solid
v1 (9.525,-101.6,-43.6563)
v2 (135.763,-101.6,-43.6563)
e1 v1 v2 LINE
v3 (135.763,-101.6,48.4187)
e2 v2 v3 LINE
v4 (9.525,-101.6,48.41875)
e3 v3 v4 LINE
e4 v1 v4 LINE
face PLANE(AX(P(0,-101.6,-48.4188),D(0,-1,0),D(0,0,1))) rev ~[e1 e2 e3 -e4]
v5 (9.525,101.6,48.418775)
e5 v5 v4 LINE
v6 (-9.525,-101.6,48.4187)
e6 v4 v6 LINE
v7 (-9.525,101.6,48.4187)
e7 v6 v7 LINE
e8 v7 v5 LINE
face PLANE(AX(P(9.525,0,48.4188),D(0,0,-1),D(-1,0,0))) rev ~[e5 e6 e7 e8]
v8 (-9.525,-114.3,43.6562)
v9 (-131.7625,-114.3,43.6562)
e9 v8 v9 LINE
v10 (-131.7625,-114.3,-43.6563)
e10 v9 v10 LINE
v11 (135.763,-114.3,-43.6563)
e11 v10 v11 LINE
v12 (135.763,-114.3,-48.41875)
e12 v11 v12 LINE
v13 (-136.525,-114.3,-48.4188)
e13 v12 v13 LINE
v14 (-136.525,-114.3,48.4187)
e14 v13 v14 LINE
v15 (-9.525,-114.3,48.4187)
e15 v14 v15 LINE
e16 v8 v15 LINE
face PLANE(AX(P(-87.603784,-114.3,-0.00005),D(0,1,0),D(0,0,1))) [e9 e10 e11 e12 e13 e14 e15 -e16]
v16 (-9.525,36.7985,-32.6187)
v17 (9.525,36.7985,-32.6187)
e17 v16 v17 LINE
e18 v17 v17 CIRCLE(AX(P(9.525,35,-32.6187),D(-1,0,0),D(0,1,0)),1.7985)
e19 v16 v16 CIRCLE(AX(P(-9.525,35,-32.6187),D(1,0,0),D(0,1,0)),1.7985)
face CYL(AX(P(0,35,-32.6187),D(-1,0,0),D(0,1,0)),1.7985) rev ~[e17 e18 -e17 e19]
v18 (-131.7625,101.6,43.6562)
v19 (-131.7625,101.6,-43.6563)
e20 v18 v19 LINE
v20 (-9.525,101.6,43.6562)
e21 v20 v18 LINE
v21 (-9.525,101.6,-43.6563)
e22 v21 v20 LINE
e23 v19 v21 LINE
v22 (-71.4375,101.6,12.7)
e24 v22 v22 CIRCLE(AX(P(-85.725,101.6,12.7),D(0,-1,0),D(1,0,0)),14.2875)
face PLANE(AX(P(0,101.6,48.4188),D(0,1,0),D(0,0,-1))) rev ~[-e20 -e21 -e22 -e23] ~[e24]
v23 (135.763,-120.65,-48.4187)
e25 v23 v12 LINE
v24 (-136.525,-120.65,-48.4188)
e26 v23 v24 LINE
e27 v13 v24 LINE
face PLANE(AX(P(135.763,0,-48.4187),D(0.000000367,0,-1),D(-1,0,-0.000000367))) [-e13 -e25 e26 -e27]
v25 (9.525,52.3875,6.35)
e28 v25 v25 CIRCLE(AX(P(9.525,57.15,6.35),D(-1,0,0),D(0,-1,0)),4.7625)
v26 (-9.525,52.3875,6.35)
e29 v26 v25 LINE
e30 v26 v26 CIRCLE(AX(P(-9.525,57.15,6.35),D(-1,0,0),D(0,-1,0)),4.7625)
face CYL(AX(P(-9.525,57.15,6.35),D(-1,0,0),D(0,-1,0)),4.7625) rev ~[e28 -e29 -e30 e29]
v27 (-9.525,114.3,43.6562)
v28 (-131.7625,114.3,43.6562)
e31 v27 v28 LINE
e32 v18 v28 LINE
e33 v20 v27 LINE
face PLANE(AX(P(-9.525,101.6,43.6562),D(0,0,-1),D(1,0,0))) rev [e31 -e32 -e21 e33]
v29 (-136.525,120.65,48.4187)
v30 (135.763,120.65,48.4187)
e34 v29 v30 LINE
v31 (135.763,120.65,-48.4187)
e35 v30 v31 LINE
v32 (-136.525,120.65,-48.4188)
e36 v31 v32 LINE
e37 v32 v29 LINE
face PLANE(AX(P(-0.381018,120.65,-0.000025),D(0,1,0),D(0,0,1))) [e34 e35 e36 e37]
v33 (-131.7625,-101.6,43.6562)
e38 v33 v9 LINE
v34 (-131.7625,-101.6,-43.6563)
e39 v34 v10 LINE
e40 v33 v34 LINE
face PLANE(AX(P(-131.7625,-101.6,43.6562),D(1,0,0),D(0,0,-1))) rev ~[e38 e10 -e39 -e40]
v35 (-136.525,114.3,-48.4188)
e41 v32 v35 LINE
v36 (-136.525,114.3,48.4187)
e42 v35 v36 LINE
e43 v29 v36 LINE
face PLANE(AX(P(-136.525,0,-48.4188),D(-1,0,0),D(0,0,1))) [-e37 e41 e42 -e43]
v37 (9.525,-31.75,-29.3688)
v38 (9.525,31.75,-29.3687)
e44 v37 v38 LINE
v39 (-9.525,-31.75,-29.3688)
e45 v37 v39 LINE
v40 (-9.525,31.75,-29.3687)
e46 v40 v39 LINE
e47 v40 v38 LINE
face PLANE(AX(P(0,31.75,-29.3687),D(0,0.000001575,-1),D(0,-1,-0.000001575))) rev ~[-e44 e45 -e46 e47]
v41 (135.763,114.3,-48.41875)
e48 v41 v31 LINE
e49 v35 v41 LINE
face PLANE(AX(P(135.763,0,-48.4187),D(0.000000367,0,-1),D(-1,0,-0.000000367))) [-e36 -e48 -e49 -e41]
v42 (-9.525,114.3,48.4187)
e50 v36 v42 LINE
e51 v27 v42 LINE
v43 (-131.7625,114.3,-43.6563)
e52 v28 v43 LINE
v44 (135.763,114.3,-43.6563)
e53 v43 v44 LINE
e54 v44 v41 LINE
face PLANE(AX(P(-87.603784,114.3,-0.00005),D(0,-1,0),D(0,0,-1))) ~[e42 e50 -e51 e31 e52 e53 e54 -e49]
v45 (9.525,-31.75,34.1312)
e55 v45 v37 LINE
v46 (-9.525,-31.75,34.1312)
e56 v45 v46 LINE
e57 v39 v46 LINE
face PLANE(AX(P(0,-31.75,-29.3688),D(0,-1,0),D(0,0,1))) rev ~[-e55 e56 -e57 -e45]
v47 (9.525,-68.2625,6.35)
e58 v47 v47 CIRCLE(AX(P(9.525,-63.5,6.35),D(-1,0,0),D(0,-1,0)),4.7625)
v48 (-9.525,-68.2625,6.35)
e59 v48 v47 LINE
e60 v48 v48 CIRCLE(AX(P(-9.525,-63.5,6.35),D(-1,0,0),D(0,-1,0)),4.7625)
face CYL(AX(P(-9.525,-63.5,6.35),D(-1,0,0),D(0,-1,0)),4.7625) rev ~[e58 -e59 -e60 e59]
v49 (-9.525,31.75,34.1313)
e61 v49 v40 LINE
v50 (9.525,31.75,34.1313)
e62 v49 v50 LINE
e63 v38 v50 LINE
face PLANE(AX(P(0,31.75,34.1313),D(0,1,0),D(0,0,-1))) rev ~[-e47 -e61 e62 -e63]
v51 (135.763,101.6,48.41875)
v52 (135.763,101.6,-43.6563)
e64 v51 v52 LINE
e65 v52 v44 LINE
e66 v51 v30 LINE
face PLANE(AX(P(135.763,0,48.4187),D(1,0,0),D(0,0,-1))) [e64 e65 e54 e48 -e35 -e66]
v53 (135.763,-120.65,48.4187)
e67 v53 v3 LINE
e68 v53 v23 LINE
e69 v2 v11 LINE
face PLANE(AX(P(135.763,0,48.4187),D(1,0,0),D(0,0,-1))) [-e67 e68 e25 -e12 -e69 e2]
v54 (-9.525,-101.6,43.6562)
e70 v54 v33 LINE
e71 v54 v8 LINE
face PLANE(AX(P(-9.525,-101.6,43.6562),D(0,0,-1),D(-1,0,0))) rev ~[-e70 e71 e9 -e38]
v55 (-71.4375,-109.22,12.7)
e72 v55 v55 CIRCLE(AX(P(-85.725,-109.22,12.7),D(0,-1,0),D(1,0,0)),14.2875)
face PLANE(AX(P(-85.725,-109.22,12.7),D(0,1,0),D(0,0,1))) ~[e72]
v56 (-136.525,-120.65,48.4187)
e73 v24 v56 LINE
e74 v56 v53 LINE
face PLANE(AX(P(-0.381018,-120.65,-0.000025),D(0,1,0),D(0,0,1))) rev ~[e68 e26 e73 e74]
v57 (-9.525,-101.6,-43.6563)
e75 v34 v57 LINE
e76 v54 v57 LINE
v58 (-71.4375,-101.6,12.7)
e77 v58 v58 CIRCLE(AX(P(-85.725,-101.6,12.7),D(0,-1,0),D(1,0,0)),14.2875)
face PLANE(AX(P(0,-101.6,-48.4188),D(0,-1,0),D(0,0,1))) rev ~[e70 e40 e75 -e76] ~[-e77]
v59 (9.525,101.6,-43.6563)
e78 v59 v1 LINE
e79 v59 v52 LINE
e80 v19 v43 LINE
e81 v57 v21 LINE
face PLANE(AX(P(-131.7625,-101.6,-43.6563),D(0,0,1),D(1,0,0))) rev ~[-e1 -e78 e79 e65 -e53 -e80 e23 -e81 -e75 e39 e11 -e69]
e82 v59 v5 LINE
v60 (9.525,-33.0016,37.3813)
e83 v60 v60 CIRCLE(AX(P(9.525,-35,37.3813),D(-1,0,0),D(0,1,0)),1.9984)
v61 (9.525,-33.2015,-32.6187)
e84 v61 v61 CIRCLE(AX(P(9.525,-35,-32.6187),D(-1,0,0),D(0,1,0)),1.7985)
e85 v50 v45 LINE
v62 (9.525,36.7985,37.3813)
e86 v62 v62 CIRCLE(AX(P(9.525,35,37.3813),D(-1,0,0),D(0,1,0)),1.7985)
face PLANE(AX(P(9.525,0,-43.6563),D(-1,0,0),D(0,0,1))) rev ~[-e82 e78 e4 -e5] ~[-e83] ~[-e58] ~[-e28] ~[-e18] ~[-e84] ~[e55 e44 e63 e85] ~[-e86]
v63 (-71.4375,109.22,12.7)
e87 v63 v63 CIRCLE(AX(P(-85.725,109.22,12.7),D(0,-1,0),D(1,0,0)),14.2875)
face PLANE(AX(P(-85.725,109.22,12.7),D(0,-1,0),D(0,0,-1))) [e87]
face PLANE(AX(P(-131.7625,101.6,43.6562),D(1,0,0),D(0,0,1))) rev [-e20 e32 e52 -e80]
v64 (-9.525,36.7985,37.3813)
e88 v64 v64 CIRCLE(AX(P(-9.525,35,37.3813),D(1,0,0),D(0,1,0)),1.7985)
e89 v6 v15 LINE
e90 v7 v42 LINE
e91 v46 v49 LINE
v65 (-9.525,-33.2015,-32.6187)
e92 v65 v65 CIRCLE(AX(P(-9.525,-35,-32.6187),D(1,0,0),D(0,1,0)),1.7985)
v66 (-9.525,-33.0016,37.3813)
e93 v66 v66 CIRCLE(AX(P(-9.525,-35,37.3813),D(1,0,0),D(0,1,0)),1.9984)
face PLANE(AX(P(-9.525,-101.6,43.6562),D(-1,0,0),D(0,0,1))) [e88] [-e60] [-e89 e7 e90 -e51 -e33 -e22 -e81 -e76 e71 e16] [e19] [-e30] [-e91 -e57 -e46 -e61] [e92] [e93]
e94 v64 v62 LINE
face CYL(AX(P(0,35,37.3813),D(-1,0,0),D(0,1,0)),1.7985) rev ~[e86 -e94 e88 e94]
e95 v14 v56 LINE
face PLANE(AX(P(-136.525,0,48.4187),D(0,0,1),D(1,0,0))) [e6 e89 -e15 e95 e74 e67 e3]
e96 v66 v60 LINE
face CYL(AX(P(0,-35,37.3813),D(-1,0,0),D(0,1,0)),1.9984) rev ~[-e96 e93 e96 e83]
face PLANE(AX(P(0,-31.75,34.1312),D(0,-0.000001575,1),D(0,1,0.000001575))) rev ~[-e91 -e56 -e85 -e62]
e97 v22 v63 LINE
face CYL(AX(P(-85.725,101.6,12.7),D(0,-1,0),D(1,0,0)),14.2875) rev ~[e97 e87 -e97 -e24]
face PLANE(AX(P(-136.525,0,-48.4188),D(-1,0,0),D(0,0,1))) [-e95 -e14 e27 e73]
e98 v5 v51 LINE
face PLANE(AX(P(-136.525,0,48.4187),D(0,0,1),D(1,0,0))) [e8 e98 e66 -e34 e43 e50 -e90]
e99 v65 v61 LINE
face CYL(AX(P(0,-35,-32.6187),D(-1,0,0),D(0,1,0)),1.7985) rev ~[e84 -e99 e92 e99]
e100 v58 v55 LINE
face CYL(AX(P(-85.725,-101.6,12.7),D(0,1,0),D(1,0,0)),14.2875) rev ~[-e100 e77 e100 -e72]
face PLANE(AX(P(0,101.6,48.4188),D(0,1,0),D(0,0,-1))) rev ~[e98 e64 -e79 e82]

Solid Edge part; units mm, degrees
sketch "Sketch1" plane through (0, 0, 0) normal (0, -1, 0) x (1, 0, 0)
  line L0 (-136.525, 48.4187) -> (135.763, 48.4187)
  line L1 (135.763, 48.4187) -> (135.763, -48.4187)
  line L2 (135.763, -48.4187) -> (-136.525, -48.4188)
  line L3 (-136.525, -48.4188) -> (-136.525, 48.4187)
  dimension "D1" = 50.8
  dimension "D2" = 96.8375
  dimension "D3" = 96.8375
extrude "Protrusion1" add sketch "Sketch1" along normal mid plane 241.3
sketch "Sketch2" plane through (0, 0, 0) normal (1, 0, 0) x (0, 1, 0)
  line L0 (101.6, -48.4187) -> (-101.6, -48.4188)
  line L1 (-101.6, -48.4188) -> (-101.6, 48.4187)
  line L2 (-101.6, 48.4187) -> (101.6, 48.4188)
  line L3 (101.6, 48.4188) -> (101.6, -48.4187)
  dimension "D1" = 19.05
  dimension "D2" = 19.05
extrude "Cutout1" cut sketch "Sketch2" along normal up to next and the other way up to next
sketch "Sketch3" plane through (6.4194, -101.6, 0) normal (0, 1, 0) x (-1, 0, 0)
  line L0 (138.1819, -43.6563) -> (15.9444, -43.6563)
  line L1 (15.9444, -48.4188) -> (15.9444, -43.6563)
  line L2 (15.9444, -48.4188) -> (142.9444, -48.4188)
  line L3 (142.9444, -48.4188) -> (142.9444, 48.4187)
  line L4 (142.9444, 48.4187) -> (15.9444, 48.4187)
  line L5 (15.9444, 43.6562) -> (15.9444, 48.4187)
  line L6 (15.9444, 43.6562) -> (138.1819, 43.6562)
  line L7 (138.1819, 43.6562) -> (138.1819, -43.6563)
  dimension "D1" = 4.7625
  dimension "D2" = 4.7625
  dimension "D3" = 4.7625
extrude "ExtrudedCutout_2" cut sketch "Sketch3" against normal blind 12.7
mirror "Mirror1" about plane through (0, 0, 0) normal (0, 1, 0) of "ExtrudedCutout_2"
sketch "Sketch4" plane through (21.4313, 101.6, 12.7) normal (0, -1, 0) x (1, 0, 0)
  circle A0 centre (-107.1563, 0) radius 14.2875
  dimension "D1" = 28.575
extrude "ExtrudedCutout_3" cut sketch "Sketch4" against normal blind 7.62
mirror "Mirror2" about plane through (0, 0, 0) normal (0, -1, 0) of "ExtrudedCutout_3"
sketch "Sketch5" plane through (6.4194, 0, 0) normal (0, -1, 0) x (1, 0, 0)
  line L0 (-15.9444, -43.6563) -> (3.1056, -43.6563)
  line L1 (3.1056, -43.6563) -> (3.1056, 48.4188)
  line L2 (3.1056, 48.4188) -> (-15.9444, 48.4188)
  line L3 (-15.9444, 48.4188) -> (-15.9444, -43.6563)
  dimension "D1" = 19.05
  dimension "D2" = 4.7625
extrude "Protrusion2" add sketch "Sketch5" along normal up to next and the other way up to next
sketch "Sketch6" plane through (0, 0, 0) normal (1, 0, 0) x (0, 1, 0)
  line L0 (31.75, -29.3687) -> (-31.75, -29.3688)
  line L1 (-31.75, -29.3688) -> (-31.75, 34.1312)
  line L2 (-31.75, 34.1313) -> (31.75, 34.1313)
  line L3 (31.75, 34.1313) -> (31.75, -29.3687)
  circle A0 centre (-35, 37.3813) radius 1.9984
  circle A1 centre (-35, -32.6187) radius 1.7985
  circle A2 centre (35, 37.3813) radius 1.7985
  circle A3 centre (35, -32.6187) radius 1.7985
  dimension "D1" = 63.5
  dimension "D2" = 63.5
  dimension "D3" = 19.05
  dimension "D4" = 70
  dimension "D5" = 70
  dimension "D6" = 80
  dimension "D7" = 80
extrude "Cutout2" cut sketch "Sketch6" along normal up to next and the other way up to next
sketch "Sketch7" plane through (-9.525, 0, 3.175) normal (-1, 0, 0) x (0, -1, 0)
  circle A0 centre (-57.15, 3.175) radius 4.7625
  circle A1 centre (63.5, 3.175) radius 4.7625
  dimension "D1" = 6.35
  dimension "D2" = 57.15
  dimension "D3" = 63.5
  dimension "D4" = 9.525
extrude "Cutout3" cut sketch "Sketch7" against normal up to next
sketch "Sketch8" plane through (-136.525, 117.475, 0) normal (-1, 0, 0) x (0, 0, 1)
  line L0 (-43.6563, -3.175) -> (-48.4188, -3.175)
  line L1 (-48.4188, -3.175) -> (-48.4188, -15.875)
  line L2 (-48.4188, -15.875) -> (-43.6563, -15.875)
  line L3 (-43.6563, -15.875) -> (-43.6563, -3.175)
  dimension "D1" = 4.7625
  dimension "D2" = 19.05
extrude "Cutout4" cut sketch "Sketch8" against normal up to next
mirror "Mirror3" about plane through (0, 0, 0) normal (0, -1, 0) of "Cutout4"
